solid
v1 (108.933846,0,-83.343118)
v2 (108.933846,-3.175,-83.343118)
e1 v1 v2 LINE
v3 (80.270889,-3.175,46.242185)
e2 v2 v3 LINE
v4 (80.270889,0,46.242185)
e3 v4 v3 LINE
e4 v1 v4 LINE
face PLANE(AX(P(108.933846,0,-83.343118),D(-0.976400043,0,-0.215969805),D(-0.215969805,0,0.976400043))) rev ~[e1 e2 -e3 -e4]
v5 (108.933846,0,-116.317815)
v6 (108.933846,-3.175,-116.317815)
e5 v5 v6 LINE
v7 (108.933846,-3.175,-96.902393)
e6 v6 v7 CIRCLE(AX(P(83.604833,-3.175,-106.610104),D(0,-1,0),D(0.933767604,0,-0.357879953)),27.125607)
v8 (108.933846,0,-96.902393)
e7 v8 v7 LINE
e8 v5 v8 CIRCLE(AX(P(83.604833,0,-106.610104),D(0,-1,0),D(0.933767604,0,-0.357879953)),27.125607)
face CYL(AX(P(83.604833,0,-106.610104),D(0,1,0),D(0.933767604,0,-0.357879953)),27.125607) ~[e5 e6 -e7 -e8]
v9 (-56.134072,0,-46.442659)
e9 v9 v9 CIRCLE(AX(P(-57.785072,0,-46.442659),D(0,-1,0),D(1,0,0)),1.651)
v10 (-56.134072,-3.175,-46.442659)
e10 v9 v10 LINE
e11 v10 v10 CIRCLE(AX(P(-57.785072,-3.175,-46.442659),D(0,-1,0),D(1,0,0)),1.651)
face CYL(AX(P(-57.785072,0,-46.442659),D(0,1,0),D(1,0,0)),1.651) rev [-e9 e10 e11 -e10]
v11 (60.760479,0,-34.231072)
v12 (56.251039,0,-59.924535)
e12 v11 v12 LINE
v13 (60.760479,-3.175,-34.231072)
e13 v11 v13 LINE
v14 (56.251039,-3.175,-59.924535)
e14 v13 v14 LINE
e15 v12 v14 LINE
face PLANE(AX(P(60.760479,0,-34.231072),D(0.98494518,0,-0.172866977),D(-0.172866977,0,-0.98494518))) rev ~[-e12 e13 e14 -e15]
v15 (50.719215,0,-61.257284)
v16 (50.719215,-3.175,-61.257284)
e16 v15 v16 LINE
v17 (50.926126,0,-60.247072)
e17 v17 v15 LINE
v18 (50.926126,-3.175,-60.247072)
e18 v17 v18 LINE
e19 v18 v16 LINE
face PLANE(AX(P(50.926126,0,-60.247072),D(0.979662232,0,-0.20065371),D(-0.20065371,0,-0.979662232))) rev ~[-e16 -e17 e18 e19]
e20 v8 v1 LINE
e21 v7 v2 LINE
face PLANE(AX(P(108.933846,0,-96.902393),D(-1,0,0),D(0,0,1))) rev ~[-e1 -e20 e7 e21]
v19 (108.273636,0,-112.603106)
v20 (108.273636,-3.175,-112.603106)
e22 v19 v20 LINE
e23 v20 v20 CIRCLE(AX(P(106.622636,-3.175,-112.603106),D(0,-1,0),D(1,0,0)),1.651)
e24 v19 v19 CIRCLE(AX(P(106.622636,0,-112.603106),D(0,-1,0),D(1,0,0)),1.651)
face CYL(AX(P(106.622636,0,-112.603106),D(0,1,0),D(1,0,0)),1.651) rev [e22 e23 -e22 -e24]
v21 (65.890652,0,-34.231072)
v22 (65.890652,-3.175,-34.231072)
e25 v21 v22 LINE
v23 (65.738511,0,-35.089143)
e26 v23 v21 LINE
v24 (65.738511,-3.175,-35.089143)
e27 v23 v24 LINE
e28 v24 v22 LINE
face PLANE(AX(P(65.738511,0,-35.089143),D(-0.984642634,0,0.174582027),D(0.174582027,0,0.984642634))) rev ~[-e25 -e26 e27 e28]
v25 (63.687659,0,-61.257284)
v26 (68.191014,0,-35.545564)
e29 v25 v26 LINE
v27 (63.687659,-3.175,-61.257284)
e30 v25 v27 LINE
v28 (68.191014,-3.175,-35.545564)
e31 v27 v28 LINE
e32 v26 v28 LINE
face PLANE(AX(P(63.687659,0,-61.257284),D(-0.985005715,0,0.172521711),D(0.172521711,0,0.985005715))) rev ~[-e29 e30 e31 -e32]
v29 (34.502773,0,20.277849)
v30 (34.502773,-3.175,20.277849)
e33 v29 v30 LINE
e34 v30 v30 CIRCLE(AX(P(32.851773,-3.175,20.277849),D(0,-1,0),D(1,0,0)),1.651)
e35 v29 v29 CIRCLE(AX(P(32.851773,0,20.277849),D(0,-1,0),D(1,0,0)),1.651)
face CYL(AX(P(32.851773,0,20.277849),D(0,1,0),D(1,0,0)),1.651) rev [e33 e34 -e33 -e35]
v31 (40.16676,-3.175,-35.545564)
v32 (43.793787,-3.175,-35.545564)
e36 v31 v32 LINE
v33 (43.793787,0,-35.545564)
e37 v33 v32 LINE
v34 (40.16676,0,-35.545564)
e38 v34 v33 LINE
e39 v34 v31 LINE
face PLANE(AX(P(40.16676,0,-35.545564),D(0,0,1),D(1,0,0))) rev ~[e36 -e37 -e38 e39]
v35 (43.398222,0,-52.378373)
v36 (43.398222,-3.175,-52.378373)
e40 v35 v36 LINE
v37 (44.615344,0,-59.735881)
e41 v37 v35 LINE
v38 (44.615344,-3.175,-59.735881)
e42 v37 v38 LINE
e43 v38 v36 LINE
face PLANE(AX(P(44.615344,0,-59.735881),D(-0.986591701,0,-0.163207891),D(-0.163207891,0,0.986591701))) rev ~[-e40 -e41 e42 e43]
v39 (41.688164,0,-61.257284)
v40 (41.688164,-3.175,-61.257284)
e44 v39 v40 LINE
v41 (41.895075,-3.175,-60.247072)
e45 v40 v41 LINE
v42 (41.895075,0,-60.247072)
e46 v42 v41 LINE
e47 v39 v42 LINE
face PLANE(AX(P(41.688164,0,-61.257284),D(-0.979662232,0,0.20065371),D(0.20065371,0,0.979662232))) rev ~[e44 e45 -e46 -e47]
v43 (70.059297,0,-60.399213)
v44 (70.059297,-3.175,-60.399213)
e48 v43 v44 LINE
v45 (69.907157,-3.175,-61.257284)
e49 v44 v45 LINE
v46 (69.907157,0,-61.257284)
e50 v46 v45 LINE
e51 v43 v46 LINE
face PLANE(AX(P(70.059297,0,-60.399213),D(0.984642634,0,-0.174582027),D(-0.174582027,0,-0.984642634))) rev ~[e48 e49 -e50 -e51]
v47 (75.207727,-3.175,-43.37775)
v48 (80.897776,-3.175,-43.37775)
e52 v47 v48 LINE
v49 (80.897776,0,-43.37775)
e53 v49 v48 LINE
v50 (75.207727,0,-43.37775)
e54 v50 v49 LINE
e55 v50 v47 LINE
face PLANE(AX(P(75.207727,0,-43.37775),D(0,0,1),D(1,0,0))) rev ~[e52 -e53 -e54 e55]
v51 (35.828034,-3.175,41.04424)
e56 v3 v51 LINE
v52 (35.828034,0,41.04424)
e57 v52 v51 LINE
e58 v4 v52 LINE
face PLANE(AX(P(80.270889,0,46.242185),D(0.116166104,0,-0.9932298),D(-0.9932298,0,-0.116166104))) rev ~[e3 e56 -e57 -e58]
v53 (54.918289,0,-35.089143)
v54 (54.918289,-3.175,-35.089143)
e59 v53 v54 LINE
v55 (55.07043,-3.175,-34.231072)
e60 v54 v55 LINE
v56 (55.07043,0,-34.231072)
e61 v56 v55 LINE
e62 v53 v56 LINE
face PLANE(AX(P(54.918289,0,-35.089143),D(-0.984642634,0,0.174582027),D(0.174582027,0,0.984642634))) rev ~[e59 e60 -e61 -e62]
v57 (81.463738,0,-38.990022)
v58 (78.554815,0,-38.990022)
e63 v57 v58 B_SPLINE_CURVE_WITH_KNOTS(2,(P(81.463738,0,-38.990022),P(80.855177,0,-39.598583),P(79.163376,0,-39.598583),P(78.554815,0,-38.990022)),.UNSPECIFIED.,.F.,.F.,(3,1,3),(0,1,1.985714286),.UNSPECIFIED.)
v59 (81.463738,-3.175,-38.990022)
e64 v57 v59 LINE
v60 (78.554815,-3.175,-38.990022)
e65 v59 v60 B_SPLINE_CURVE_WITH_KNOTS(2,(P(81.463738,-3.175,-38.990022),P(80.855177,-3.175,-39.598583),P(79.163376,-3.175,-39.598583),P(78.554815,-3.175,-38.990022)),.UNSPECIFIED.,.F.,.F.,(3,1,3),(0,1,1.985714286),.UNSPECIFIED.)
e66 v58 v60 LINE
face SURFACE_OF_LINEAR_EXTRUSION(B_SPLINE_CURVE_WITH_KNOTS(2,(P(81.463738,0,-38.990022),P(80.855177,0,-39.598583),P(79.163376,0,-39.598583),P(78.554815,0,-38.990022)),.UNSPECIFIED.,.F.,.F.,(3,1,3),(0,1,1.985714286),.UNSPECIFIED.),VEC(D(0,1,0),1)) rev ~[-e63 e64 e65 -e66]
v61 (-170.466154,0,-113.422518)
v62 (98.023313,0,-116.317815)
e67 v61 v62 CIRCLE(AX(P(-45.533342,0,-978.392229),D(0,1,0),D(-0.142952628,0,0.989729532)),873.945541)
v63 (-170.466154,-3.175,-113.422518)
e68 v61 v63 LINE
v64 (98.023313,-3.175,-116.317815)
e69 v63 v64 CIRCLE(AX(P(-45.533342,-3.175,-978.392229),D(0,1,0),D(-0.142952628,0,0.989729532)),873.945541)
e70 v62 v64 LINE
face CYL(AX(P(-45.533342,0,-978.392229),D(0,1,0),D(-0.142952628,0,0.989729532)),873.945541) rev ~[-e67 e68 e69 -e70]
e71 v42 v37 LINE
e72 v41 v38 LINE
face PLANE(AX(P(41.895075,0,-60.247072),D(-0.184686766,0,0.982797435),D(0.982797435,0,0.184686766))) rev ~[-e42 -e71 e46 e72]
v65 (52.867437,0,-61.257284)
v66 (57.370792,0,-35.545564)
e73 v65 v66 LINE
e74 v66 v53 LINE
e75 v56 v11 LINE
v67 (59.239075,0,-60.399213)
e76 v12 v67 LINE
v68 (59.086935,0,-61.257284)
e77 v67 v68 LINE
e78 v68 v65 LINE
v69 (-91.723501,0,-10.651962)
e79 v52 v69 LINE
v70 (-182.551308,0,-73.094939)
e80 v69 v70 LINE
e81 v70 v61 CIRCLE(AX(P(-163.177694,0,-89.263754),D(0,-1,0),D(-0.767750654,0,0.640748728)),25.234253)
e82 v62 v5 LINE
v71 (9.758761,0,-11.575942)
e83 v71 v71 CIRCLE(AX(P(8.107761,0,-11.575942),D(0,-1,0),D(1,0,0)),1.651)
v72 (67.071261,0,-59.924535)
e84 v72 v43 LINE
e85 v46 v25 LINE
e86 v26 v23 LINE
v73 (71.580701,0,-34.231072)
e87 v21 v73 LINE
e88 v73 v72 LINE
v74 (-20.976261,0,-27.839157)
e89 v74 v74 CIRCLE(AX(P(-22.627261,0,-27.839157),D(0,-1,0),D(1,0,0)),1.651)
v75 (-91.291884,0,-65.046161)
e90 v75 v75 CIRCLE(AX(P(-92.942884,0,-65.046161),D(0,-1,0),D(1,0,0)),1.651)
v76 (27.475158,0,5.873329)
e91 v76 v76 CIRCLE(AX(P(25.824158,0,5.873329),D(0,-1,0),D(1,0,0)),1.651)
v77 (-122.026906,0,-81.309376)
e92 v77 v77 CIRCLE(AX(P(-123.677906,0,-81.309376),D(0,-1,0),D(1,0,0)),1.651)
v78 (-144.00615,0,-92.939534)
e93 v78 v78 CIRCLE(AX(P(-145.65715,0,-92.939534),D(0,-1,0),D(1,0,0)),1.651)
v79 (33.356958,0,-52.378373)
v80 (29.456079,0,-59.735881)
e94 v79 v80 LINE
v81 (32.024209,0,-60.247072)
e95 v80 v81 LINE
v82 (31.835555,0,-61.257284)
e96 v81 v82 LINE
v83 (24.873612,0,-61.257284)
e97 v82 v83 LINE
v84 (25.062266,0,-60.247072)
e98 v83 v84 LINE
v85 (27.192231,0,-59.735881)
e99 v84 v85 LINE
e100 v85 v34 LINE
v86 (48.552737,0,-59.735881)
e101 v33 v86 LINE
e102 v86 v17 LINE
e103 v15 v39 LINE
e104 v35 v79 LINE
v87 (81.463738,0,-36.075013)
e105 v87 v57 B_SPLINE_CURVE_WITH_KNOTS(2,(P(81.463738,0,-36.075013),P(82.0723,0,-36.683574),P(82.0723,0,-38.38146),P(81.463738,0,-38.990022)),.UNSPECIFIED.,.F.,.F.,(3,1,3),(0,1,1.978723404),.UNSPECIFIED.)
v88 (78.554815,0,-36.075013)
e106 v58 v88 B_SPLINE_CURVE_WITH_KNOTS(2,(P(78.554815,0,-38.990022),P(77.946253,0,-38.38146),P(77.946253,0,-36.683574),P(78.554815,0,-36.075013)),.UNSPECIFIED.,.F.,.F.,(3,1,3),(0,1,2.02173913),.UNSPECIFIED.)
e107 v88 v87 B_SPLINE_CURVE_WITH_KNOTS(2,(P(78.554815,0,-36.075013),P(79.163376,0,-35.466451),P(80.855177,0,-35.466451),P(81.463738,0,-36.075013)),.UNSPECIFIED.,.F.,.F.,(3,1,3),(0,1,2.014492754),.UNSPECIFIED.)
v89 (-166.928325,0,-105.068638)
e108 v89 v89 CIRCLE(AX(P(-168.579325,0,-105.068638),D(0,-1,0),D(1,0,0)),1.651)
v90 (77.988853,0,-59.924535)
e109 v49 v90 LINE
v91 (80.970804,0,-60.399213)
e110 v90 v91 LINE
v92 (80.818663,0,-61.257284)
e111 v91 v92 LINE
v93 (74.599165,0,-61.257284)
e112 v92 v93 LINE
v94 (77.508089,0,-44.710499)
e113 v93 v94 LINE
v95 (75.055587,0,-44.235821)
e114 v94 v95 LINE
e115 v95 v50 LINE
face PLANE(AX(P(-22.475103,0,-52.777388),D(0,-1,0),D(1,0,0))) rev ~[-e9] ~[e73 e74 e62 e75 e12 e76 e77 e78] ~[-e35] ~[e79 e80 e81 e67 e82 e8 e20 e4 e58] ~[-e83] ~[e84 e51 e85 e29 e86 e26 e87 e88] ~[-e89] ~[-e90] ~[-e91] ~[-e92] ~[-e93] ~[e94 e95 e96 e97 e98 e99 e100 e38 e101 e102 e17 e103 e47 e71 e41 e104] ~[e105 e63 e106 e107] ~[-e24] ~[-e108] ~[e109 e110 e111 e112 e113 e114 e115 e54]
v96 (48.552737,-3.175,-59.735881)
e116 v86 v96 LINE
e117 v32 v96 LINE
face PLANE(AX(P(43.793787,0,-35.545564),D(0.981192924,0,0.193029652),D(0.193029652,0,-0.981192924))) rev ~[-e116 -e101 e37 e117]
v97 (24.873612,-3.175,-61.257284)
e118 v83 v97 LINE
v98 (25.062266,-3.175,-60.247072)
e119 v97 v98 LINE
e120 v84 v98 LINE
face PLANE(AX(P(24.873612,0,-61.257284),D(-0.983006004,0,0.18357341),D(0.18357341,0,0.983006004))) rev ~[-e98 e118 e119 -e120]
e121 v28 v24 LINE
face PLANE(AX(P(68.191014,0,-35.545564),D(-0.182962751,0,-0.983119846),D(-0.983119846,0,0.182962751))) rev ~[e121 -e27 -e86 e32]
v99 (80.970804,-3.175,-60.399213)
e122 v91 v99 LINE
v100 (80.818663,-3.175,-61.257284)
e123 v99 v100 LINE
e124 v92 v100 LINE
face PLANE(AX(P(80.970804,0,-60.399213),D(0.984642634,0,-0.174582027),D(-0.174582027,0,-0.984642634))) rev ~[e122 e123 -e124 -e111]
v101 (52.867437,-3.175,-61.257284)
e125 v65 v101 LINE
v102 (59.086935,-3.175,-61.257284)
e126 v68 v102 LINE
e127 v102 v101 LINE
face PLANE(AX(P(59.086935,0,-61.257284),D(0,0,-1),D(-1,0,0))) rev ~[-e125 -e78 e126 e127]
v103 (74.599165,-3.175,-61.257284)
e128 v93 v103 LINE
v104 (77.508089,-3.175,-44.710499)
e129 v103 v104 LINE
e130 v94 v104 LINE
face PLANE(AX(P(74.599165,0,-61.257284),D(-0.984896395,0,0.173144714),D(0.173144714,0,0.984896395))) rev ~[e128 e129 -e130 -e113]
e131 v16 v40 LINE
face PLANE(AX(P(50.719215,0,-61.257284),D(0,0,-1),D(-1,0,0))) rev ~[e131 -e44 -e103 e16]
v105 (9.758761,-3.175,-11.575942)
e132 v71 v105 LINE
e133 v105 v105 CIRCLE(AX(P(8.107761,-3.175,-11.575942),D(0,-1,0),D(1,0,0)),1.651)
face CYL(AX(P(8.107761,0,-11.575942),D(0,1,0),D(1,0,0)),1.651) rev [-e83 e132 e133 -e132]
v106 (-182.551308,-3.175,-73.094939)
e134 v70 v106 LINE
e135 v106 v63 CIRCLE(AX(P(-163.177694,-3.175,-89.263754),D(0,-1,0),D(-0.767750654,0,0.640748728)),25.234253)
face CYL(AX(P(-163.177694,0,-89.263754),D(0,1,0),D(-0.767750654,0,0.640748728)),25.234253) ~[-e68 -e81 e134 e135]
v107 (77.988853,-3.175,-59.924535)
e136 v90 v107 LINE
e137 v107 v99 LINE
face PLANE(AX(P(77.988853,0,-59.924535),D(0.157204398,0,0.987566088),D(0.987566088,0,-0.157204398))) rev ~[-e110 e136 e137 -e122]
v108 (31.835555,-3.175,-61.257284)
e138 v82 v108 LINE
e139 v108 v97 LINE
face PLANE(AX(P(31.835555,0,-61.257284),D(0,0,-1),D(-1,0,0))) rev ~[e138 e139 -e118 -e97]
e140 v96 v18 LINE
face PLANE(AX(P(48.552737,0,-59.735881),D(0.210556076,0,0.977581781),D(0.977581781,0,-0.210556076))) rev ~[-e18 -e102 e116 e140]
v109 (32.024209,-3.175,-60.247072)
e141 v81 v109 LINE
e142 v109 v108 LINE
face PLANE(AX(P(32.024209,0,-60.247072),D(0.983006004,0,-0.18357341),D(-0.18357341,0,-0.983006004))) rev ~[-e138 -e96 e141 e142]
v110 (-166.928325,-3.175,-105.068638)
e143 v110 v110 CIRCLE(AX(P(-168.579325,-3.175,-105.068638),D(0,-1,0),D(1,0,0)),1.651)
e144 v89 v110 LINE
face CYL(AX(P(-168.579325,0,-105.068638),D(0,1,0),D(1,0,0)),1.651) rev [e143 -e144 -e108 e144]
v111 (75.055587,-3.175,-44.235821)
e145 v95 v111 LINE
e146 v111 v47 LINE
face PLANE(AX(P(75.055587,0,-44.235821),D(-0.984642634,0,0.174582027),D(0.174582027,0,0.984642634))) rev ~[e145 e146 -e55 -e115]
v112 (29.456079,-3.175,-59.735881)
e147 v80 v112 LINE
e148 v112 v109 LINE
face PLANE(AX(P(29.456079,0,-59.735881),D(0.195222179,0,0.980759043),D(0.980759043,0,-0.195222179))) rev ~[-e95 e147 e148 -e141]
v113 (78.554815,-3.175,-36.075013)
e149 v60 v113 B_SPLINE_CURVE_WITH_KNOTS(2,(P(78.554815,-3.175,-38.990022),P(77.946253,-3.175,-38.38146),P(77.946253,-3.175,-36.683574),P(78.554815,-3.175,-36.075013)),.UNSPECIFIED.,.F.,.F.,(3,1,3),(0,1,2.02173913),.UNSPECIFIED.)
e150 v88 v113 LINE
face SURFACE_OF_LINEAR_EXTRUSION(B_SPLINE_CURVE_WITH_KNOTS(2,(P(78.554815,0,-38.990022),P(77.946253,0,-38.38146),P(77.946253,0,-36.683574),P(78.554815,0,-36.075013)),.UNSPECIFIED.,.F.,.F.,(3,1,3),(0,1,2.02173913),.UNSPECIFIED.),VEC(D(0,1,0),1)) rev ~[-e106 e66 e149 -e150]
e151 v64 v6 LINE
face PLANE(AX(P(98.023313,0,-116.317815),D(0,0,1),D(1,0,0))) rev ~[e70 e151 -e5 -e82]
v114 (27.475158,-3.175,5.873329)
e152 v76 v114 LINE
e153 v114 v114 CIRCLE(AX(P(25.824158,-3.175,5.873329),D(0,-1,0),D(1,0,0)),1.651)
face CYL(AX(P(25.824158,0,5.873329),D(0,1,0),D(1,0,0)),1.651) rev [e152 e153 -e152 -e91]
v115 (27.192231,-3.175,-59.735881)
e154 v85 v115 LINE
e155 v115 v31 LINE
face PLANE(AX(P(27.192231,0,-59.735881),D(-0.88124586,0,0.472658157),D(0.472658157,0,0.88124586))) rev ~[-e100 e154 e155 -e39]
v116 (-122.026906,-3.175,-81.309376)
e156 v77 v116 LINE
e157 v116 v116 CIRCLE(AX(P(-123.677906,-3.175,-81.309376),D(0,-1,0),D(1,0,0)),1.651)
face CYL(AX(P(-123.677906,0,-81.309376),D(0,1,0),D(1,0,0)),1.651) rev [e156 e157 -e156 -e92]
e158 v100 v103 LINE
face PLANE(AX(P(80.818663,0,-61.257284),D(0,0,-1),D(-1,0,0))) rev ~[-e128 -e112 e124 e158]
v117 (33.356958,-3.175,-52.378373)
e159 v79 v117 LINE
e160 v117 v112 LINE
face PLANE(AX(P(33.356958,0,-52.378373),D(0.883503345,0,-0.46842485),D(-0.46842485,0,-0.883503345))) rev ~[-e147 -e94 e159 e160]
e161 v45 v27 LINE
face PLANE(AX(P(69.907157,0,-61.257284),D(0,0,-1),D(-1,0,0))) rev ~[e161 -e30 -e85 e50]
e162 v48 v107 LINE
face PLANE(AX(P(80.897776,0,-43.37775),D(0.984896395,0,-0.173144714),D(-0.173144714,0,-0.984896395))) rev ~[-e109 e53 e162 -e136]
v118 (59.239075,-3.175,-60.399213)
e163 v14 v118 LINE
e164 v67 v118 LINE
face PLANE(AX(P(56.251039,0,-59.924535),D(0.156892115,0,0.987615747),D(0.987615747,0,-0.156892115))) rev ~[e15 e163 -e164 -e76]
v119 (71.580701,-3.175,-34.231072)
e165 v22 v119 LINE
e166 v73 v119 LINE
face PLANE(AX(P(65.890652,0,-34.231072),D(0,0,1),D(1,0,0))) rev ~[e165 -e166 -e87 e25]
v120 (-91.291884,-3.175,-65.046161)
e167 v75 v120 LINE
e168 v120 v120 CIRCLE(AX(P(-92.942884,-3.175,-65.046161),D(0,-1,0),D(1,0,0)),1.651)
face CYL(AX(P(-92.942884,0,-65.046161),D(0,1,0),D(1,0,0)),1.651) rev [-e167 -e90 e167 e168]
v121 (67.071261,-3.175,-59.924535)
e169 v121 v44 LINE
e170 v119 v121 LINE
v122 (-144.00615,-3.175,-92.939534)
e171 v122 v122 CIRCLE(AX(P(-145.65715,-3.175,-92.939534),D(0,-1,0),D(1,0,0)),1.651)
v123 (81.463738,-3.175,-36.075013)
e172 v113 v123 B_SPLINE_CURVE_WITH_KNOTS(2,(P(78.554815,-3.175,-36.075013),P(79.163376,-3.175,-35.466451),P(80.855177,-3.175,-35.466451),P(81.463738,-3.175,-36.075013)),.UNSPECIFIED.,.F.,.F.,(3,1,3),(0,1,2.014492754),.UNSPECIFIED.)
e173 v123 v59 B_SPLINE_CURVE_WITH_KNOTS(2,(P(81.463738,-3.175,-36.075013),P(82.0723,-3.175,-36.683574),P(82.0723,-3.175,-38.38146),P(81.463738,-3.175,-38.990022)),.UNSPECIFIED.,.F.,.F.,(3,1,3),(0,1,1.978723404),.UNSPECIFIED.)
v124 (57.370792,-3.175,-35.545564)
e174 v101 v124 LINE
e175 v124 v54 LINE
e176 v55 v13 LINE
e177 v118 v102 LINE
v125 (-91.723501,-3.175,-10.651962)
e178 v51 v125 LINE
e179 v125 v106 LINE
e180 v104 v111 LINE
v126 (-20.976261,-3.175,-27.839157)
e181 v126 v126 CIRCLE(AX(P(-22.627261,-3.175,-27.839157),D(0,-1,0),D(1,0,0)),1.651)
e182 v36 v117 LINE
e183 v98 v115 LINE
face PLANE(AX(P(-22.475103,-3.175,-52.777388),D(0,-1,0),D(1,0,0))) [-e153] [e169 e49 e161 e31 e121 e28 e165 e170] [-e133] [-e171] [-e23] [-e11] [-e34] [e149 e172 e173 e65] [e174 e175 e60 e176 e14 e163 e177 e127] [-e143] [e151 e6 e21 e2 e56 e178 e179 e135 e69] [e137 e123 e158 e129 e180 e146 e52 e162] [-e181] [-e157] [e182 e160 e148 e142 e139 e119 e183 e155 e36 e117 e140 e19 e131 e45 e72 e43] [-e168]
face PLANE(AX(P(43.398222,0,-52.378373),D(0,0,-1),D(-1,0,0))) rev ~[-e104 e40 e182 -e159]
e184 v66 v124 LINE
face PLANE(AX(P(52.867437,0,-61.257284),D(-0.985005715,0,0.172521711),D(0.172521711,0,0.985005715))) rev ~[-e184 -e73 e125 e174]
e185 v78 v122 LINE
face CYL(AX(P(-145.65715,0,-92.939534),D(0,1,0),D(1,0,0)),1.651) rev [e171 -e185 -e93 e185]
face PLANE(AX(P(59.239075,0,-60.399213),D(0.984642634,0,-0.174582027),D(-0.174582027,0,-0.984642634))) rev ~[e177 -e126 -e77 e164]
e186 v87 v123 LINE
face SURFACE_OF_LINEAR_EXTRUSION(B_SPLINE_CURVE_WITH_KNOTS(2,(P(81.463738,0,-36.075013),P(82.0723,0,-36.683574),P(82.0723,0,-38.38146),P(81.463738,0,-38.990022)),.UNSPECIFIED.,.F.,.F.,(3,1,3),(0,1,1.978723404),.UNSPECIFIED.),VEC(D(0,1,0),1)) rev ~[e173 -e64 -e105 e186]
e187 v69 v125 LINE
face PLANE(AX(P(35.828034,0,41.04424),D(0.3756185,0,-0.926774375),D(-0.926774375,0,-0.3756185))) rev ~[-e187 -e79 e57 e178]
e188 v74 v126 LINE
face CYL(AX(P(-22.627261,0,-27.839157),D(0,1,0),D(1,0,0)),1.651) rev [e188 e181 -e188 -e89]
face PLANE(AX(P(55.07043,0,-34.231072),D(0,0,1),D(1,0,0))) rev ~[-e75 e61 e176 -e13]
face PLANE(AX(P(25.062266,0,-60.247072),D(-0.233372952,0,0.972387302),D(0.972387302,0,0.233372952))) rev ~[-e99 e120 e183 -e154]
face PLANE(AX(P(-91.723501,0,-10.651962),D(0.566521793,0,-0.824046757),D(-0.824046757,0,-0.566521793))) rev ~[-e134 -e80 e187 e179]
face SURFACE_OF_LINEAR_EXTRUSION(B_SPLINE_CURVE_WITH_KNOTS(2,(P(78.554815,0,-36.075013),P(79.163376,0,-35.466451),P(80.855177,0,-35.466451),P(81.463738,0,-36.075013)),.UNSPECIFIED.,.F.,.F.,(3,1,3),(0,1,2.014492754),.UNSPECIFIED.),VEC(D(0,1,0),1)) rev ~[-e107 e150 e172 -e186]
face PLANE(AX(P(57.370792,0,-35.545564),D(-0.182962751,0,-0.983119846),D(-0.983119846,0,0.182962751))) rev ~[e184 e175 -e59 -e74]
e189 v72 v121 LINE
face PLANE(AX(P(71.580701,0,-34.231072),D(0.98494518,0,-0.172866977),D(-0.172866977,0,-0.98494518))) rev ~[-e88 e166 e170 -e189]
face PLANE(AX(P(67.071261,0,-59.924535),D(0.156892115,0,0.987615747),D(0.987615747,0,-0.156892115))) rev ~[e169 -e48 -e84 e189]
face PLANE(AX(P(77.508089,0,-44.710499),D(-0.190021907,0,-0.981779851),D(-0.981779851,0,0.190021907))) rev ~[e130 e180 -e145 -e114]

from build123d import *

# Parameters (mm, degrees)
F0_R     = 1.651
F1_DEPTH = 3.175


with BuildPart() as f1:
    # F0 (on Front) → F1 (new body)
    with BuildSketch(Plane.XZ):
        with BuildLine():
            Line((-91.7235008659, -10.6519622226), (-182.5513082058, -73.0949387128))
            ThreePointArc((-182.5513082058, -73.0949387128), (-187.3498879631, -96.5075485814), (-170.466153763, -113.4225179282))
            ThreePointArc((-170.466153763, -113.4225179282), (-36.1095650791, -104.4974979583), (98.0233131029, -116.3178149951))
            Line((98.0233131029, -116.3178149951), (108.933846237, -116.3178149951))
            ThreePointArc((108.933846237, -116.3178149951), (110.7304402005, -106.6101038659), (108.933846237, -96.9023927367))
            Line((108.933846237, -96.9023927367), (108.933846237, -83.3431183613))
            Line((108.933846237, -83.3431183613), (80.270888986, 46.2421850049))
            Line((80.270888986, 46.2421850049), (35.8280335171, 41.0442404951))
            Line((35.8280335171, 41.0442404951), (-91.7235008659, -10.6519622226))
        make_face()
        with Locations((-168.5793250799, -105.0686376895)):
            Circle(F0_R, mode=Mode.SUBTRACT)
        with Locations((-145.6571504202, -92.9395344899)):
            Circle(F0_R, mode=Mode.SUBTRACT)
        with Locations((-123.6779055701, -81.3093757901)):
            Circle(F0_R, mode=Mode.SUBTRACT)
        with Locations((-92.9428839156, -65.04616102)):
            Circle(F0_R, mode=Mode.SUBTRACT)
        with Locations((-57.7850724394, -46.4426589528)):
            Circle(F0_R, mode=Mode.SUBTRACT)
        with Locations((106.6226363182, -112.6031056046)):
            Circle(F0_R, mode=Mode.SUBTRACT)
        Polygon((29.4560794945, -59.7358805891), (32.0242086794, -60.2470721804), (31.8355546398, -61.2572841346), (24.8736120152, -61.2572841346), (25.0622660549, -60.2470721804), (27.1922310187, -59.7358805891), (40.1667604553, -35.5455642146), (43.7937865079, -35.5455642146), (48.5527367984, -59.7358805891), (50.9261263295, -60.2470721804), (50.7192154473, -61.2572841346), (41.6881640008, -61.2572841346), (41.895074883, -60.2470721804), (44.6153444225, -59.7358805891), (43.3982215861, -52.3783730427), (33.3569581853, -52.3783730427), align=None, mode=Mode.SUBTRACT)
        Polygon((60.760478848, -34.2310715512), (56.251038739, -59.9245346287), (59.2390753025, -60.3992125349), (59.0869349479, -61.2572841346), (52.8674372537, -61.2572841346), (57.3707917485, -35.5455642146), (54.9182892331, -35.0891431509), (55.0704295876, -34.2310715512), align=None, mode=Mode.SUBTRACT)
        Polygon((71.5807008641, -34.2310715512), (67.0712607551, -59.9245346287), (70.0592973185, -60.3992125349), (69.907156964, -61.2572841346), (63.6876592697, -61.2572841346), (68.1910137646, -35.5455642146), (65.7385112491, -35.0891431509), (65.8906516037, -34.2310715512), align=None, mode=Mode.SUBTRACT)
        Polygon((80.8977761772, -43.3777496671), (77.988852598, -59.9245346287), (80.9708035473, -60.3992125349), (80.8186631928, -61.2572841346), (74.5991654985, -61.2572841346), (77.5080890776, -44.7104991731), (75.0555865622, -44.2358212668), (75.2077269167, -43.3777496671), align=None, mode=Mode.SUBTRACT)
        with BuildLine():
            add(Edge.make_bspline(
                [(81.4637382961, -36.0750126484), (82.0722997143, -36.6835740667), (82.0722997143, -37.5416456664)],
                knots=[0, 0, 0, 1, 1, 1], degree=2))
            add(Edge.make_bspline(
                [(82.0722997143, -37.5416456664), (82.0722997143, -38.3814604235), (81.4637382961, -38.9900218417)],
                knots=[0, 0, 0, 1, 1, 1], degree=2))
            add(Edge.make_bspline(
                [(81.4637382961, -38.9900218417), (80.8551768779, -39.59858326), (80.0031908924, -39.59858326)],
                knots=[0, 0, 0, 1, 1, 1], degree=2))
            add(Edge.make_bspline(
                [(80.0031908924, -39.59858326), (79.1633761352, -39.59858326), (78.554814717, -38.9900218417)],
                knots=[0, 0, 0, 1, 1, 1], degree=2))
            add(Edge.make_bspline(
                [(78.554814717, -38.9900218417), (77.9462532988, -38.3814604235), (77.9462532988, -37.5416456664)],
                knots=[0, 0, 0, 1, 1, 1], degree=2))
            add(Edge.make_bspline(
                [(77.9462532988, -37.5416456664), (77.9462532988, -36.6835740667), (78.554814717, -36.0750126484)],
                knots=[0, 0, 0, 1, 1, 1], degree=2))
            add(Edge.make_bspline(
                [(78.554814717, -36.0750126484), (79.1633761352, -35.4664512302), (80.0031908924, -35.4664512302)],
                knots=[0, 0, 0, 1, 1, 1], degree=2))
            add(Edge.make_bspline(
                [(80.0031908924, -35.4664512302), (80.8551768779, -35.4664512302), (81.4637382961, -36.0750126484)],
                knots=[0, 0, 0, 1, 1, 1], degree=2))
        make_face(mode=Mode.SUBTRACT)
        with Locations((-22.6272609633, -27.8391568856)):
            Circle(F0_R, mode=Mode.SUBTRACT)
        with Locations((8.1077606912, -11.5759421154)):
            Circle(F0_R, mode=Mode.SUBTRACT)
        with Locations((25.8241575211, 5.8733294718)):
            Circle(F0_R, mode=Mode.SUBTRACT)
        with Locations((32.8517727122, 20.2778487448)):
            Circle(F0_R, mode=Mode.SUBTRACT)
    extrude(amount=F1_DEPTH)


solid = f1.part
